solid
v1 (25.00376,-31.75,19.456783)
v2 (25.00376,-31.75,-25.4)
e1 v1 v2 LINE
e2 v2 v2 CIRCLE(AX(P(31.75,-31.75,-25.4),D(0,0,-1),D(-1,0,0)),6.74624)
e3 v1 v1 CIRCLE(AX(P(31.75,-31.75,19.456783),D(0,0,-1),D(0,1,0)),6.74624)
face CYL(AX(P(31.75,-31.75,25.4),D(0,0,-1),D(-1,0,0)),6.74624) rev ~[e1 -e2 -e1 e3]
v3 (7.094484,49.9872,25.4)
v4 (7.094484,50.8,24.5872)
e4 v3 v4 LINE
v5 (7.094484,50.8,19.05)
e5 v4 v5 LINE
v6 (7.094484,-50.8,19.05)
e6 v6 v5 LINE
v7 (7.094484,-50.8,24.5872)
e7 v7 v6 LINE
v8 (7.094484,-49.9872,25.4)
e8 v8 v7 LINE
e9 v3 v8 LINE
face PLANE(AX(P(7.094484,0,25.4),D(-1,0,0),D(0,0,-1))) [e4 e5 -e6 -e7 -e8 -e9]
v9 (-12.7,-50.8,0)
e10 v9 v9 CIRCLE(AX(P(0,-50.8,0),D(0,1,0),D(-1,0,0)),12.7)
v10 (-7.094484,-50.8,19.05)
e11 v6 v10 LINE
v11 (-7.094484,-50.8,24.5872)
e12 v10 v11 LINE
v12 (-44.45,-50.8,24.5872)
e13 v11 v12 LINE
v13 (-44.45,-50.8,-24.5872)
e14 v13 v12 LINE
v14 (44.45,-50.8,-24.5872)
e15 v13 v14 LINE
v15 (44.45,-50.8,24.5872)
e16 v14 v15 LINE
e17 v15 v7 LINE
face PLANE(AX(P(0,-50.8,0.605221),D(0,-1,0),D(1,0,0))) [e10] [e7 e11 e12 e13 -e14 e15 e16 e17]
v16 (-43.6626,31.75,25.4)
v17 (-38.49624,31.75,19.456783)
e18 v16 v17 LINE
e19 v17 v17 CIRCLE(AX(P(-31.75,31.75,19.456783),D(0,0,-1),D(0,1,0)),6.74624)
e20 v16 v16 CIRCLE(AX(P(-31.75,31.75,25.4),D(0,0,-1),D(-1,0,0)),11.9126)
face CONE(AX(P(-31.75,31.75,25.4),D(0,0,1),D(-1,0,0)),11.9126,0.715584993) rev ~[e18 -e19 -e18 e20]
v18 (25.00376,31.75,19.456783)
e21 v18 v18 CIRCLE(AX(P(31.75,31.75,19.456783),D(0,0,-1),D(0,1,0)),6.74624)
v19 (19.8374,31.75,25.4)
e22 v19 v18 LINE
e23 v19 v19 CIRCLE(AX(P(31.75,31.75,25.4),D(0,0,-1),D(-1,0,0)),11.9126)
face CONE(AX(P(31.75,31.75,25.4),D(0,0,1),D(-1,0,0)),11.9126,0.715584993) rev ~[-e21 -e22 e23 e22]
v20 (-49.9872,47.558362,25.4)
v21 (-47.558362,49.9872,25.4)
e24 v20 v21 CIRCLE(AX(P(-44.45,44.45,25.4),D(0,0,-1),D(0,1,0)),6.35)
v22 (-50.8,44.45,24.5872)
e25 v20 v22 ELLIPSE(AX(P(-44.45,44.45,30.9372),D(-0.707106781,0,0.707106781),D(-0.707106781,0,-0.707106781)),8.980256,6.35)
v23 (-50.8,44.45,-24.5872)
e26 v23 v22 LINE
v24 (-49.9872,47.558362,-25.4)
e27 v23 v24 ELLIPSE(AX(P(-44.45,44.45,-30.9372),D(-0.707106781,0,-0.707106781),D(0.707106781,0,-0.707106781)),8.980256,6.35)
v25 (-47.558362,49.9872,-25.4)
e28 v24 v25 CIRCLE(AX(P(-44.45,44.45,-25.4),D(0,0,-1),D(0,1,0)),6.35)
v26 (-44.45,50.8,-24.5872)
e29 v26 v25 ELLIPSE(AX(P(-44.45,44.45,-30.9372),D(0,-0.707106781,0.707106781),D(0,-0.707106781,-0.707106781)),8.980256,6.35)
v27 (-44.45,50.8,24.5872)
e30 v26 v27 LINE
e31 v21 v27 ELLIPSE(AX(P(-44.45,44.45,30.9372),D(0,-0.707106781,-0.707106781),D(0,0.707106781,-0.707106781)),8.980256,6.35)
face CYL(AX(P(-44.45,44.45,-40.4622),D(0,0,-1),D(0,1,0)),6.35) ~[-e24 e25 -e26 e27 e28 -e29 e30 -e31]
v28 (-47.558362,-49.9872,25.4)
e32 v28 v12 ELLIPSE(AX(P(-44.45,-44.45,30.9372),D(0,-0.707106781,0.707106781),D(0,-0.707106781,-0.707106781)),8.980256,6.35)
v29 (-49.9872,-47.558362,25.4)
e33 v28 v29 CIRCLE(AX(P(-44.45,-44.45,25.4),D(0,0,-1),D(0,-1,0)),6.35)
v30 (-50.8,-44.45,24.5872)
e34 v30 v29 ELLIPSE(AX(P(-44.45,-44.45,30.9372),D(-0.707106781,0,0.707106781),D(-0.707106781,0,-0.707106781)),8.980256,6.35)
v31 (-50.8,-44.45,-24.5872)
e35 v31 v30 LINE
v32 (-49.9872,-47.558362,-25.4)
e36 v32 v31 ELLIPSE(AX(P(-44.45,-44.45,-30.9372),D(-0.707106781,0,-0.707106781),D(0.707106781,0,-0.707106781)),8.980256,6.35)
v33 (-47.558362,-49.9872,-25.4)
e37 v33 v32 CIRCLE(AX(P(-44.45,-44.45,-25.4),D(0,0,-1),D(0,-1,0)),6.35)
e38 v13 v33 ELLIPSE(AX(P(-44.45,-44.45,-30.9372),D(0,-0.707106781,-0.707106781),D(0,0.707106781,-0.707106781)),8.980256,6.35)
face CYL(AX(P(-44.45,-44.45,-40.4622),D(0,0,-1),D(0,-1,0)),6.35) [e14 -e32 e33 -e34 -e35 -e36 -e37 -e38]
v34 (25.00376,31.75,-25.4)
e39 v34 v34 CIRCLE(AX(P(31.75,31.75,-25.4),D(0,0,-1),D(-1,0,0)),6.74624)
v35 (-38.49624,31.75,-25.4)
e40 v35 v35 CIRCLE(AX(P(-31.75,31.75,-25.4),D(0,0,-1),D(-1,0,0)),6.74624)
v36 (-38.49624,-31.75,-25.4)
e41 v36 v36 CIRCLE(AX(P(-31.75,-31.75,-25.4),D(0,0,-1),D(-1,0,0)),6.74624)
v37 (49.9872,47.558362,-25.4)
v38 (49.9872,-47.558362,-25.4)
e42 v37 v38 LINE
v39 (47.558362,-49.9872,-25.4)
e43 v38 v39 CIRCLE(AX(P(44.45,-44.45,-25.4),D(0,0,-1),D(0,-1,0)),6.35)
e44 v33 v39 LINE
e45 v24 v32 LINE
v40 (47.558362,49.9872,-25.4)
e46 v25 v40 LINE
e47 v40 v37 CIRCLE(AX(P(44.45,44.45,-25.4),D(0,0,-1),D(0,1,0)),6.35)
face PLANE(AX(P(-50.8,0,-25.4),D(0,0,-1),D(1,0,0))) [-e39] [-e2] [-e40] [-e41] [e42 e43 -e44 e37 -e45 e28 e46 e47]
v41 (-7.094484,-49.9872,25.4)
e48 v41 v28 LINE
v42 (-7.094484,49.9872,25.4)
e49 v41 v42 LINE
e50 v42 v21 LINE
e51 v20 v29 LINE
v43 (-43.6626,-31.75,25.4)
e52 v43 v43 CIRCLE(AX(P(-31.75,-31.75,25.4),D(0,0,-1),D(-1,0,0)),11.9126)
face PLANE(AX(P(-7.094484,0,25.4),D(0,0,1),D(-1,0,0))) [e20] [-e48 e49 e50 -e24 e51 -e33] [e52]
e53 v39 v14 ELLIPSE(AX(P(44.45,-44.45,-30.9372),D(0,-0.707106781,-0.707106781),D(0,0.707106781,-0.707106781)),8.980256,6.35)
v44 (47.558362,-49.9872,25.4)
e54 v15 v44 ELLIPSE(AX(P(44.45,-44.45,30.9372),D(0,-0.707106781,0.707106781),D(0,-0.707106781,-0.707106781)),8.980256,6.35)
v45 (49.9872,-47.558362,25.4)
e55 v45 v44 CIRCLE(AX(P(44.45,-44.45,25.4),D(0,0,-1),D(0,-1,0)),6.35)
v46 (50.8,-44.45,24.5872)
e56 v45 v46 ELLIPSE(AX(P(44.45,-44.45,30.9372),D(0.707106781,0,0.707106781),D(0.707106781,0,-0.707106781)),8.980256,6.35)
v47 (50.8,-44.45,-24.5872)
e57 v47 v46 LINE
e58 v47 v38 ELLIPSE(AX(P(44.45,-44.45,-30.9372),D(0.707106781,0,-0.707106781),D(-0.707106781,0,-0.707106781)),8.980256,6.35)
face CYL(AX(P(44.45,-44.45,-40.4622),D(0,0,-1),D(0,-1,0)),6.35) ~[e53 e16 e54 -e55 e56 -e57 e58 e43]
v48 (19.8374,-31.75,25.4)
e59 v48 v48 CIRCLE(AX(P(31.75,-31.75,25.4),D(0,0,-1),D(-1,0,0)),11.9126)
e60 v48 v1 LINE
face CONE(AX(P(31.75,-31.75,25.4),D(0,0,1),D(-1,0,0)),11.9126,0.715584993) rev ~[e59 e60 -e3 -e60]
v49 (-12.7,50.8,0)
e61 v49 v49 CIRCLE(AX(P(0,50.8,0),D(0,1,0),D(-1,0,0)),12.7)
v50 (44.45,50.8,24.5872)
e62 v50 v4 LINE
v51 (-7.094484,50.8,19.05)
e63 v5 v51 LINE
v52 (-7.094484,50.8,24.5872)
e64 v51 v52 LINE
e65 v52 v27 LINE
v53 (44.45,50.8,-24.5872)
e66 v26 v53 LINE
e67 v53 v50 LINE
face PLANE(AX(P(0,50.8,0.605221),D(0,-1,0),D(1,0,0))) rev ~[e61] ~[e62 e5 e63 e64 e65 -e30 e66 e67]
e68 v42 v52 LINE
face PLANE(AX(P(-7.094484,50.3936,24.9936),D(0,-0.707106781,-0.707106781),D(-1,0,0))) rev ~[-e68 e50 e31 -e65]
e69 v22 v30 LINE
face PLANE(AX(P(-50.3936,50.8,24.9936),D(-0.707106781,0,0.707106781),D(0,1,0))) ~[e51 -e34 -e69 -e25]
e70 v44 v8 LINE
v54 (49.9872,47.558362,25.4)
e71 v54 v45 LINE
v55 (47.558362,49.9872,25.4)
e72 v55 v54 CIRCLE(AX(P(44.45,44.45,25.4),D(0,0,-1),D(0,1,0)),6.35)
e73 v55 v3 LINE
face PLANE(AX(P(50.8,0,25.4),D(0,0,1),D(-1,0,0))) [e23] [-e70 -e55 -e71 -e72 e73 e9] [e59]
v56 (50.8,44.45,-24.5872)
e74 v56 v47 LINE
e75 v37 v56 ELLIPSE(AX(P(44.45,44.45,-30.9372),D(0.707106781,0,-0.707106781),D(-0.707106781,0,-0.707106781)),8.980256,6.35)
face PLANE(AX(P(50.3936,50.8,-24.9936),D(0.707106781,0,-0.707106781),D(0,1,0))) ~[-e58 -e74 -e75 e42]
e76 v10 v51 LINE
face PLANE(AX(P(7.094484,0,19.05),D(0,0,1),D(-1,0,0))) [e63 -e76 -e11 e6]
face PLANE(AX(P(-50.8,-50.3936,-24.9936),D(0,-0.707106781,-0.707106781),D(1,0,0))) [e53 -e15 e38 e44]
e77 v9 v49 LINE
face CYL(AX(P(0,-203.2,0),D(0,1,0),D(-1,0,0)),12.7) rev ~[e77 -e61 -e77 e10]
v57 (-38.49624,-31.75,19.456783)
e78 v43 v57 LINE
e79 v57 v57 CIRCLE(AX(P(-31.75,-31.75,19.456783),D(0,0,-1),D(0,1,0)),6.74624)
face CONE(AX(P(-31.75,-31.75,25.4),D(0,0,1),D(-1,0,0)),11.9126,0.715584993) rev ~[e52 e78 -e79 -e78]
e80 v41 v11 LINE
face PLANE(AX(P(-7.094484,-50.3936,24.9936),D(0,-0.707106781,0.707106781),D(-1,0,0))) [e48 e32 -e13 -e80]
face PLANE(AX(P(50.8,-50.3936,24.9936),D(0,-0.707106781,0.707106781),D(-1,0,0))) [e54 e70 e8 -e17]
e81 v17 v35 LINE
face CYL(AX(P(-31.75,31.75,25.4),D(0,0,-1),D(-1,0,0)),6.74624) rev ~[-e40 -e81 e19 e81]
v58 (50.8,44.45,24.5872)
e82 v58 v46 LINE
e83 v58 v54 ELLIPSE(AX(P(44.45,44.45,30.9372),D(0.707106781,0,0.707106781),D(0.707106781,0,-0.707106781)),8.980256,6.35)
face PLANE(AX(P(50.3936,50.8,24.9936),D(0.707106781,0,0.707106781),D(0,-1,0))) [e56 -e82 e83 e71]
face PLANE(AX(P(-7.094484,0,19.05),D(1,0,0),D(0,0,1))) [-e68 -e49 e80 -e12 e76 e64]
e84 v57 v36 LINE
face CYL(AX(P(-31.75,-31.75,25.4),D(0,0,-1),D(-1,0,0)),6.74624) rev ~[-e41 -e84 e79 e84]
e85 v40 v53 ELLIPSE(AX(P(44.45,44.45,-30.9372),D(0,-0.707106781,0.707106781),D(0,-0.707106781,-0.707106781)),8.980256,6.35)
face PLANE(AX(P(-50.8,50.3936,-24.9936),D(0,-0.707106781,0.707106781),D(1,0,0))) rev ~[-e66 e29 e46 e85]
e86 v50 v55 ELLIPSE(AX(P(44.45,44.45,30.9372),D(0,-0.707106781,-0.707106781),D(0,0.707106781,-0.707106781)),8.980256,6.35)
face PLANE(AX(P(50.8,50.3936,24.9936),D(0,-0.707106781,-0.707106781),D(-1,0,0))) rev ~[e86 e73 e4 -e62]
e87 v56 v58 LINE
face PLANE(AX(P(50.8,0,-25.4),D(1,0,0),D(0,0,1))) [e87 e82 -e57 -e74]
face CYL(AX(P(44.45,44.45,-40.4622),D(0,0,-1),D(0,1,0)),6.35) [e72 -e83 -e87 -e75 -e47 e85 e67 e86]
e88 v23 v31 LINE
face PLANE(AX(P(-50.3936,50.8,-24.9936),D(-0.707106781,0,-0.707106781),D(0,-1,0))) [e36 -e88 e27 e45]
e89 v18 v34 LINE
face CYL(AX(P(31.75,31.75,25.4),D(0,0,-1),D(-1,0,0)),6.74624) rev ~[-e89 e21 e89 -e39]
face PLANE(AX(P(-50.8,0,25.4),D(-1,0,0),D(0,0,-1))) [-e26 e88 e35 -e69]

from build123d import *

# Parameters (mm, degrees)
F1_DEPTH       = 50.8
F3_D           = 13.49248
F3_CSINK_D     = 23.8252
F3_CSINK_ANGLE = 82
F4_SIZE        = 0.8128
F5_T1_DEPTH    = 80.9244
F7_D           = 25.4


# Not quite as in the source:
# - a fillet or chamfer that OpenCascade refuses, or shapes differently, is made with other operations: its cross-section is extruded or revolved along the edge and cut away or added


with BuildPart() as f1:
    # F0 (on Front) → F1 (new body, symmetric)
    with BuildSketch(Plane.XZ):
        Polygon((-7.0944838226, 25.4), (-50.8, 25.4), (-50.8, -25.4), (50.8, -25.4), (50.8, 25.4), (7.0944838226, 25.4), (7.0944838226, 19.05), (0, 19.05), (-7.0944838226, 19.05), align=None)
    extrude(amount=F1_DEPTH, both=True)

    # F3 (through all)
    with Locations(Plane.XY.offset(25.4)):
        with Locations((-31.75, 31.75), (31.75, 31.75), (31.75, -31.75), (-31.75, -31.75)):
            CounterSinkHole(F3_D / 2, F3_CSINK_D / 2, counter_sink_angle=F3_CSINK_ANGLE)

    # F4
    f4_edges = [f1.edges().sort_by_distance(p)[0] for p in [
        (-50.8, 0, 25.4),
        (50.8, 0, 25.4),
        (0, -50.8, -25.4),
        (-50.8, 0, -25.4),
        (0, 50.8, -25.4),
        (50.8, 0, -25.4),
        (-28.947242, -50.8, 25.4),
        (28.947242, -50.8, 25.4),
        (28.947242, 50.8, 25.4),
        (-28.947242, 50.8, 25.4),
    ]]
    chamfer(f4_edges, length=F4_SIZE)

    # F5: fillet of radius 6.35 on 4 edges, made by hand

    # F5_s2 → F5_t1 (cut)
    with BuildSketch(Plane.XY.offset(-40.4622)):
        with BuildLine():
            ThreePointArc((-44.45, -50.8), (-48.9401280605, -48.9401280605), (-50.8, -44.45))
            Line((-50.8, -44.45), (-50.8, -50.8))
            Line((-50.8, -50.8), (-44.45, -50.8))
        make_face()
        with BuildLine():
            ThreePointArc((44.45, -50.8), (48.9401280605, -48.9401280605), (50.8, -44.45))
            Line((50.8, -44.45), (50.8, -50.8))
            Line((50.8, -50.8), (44.45, -50.8))
        make_face()
        with BuildLine():
            ThreePointArc((44.45, 50.8), (48.9401280605, 48.9401280605), (50.8, 44.45))
            Line((50.8, 44.45), (50.8, 50.8))
            Line((50.8, 50.8), (44.45, 50.8))
        make_face()
        with BuildLine():
            ThreePointArc((-44.45, 50.8), (-48.9401280605, 48.9401280605), (-50.8, 44.45))
            Line((-50.8, 44.45), (-50.8, 50.8))
            Line((-50.8, 50.8), (-44.45, 50.8))
        make_face()
    extrude(amount=F5_T1_DEPTH, mode=Mode.SUBTRACT)

    # F7 (through all)
    with Locations(Plane.XZ.offset(50.8)):
        with Locations((0, 0)):
            Hole(F7_D / 2)


solid = f1.part
